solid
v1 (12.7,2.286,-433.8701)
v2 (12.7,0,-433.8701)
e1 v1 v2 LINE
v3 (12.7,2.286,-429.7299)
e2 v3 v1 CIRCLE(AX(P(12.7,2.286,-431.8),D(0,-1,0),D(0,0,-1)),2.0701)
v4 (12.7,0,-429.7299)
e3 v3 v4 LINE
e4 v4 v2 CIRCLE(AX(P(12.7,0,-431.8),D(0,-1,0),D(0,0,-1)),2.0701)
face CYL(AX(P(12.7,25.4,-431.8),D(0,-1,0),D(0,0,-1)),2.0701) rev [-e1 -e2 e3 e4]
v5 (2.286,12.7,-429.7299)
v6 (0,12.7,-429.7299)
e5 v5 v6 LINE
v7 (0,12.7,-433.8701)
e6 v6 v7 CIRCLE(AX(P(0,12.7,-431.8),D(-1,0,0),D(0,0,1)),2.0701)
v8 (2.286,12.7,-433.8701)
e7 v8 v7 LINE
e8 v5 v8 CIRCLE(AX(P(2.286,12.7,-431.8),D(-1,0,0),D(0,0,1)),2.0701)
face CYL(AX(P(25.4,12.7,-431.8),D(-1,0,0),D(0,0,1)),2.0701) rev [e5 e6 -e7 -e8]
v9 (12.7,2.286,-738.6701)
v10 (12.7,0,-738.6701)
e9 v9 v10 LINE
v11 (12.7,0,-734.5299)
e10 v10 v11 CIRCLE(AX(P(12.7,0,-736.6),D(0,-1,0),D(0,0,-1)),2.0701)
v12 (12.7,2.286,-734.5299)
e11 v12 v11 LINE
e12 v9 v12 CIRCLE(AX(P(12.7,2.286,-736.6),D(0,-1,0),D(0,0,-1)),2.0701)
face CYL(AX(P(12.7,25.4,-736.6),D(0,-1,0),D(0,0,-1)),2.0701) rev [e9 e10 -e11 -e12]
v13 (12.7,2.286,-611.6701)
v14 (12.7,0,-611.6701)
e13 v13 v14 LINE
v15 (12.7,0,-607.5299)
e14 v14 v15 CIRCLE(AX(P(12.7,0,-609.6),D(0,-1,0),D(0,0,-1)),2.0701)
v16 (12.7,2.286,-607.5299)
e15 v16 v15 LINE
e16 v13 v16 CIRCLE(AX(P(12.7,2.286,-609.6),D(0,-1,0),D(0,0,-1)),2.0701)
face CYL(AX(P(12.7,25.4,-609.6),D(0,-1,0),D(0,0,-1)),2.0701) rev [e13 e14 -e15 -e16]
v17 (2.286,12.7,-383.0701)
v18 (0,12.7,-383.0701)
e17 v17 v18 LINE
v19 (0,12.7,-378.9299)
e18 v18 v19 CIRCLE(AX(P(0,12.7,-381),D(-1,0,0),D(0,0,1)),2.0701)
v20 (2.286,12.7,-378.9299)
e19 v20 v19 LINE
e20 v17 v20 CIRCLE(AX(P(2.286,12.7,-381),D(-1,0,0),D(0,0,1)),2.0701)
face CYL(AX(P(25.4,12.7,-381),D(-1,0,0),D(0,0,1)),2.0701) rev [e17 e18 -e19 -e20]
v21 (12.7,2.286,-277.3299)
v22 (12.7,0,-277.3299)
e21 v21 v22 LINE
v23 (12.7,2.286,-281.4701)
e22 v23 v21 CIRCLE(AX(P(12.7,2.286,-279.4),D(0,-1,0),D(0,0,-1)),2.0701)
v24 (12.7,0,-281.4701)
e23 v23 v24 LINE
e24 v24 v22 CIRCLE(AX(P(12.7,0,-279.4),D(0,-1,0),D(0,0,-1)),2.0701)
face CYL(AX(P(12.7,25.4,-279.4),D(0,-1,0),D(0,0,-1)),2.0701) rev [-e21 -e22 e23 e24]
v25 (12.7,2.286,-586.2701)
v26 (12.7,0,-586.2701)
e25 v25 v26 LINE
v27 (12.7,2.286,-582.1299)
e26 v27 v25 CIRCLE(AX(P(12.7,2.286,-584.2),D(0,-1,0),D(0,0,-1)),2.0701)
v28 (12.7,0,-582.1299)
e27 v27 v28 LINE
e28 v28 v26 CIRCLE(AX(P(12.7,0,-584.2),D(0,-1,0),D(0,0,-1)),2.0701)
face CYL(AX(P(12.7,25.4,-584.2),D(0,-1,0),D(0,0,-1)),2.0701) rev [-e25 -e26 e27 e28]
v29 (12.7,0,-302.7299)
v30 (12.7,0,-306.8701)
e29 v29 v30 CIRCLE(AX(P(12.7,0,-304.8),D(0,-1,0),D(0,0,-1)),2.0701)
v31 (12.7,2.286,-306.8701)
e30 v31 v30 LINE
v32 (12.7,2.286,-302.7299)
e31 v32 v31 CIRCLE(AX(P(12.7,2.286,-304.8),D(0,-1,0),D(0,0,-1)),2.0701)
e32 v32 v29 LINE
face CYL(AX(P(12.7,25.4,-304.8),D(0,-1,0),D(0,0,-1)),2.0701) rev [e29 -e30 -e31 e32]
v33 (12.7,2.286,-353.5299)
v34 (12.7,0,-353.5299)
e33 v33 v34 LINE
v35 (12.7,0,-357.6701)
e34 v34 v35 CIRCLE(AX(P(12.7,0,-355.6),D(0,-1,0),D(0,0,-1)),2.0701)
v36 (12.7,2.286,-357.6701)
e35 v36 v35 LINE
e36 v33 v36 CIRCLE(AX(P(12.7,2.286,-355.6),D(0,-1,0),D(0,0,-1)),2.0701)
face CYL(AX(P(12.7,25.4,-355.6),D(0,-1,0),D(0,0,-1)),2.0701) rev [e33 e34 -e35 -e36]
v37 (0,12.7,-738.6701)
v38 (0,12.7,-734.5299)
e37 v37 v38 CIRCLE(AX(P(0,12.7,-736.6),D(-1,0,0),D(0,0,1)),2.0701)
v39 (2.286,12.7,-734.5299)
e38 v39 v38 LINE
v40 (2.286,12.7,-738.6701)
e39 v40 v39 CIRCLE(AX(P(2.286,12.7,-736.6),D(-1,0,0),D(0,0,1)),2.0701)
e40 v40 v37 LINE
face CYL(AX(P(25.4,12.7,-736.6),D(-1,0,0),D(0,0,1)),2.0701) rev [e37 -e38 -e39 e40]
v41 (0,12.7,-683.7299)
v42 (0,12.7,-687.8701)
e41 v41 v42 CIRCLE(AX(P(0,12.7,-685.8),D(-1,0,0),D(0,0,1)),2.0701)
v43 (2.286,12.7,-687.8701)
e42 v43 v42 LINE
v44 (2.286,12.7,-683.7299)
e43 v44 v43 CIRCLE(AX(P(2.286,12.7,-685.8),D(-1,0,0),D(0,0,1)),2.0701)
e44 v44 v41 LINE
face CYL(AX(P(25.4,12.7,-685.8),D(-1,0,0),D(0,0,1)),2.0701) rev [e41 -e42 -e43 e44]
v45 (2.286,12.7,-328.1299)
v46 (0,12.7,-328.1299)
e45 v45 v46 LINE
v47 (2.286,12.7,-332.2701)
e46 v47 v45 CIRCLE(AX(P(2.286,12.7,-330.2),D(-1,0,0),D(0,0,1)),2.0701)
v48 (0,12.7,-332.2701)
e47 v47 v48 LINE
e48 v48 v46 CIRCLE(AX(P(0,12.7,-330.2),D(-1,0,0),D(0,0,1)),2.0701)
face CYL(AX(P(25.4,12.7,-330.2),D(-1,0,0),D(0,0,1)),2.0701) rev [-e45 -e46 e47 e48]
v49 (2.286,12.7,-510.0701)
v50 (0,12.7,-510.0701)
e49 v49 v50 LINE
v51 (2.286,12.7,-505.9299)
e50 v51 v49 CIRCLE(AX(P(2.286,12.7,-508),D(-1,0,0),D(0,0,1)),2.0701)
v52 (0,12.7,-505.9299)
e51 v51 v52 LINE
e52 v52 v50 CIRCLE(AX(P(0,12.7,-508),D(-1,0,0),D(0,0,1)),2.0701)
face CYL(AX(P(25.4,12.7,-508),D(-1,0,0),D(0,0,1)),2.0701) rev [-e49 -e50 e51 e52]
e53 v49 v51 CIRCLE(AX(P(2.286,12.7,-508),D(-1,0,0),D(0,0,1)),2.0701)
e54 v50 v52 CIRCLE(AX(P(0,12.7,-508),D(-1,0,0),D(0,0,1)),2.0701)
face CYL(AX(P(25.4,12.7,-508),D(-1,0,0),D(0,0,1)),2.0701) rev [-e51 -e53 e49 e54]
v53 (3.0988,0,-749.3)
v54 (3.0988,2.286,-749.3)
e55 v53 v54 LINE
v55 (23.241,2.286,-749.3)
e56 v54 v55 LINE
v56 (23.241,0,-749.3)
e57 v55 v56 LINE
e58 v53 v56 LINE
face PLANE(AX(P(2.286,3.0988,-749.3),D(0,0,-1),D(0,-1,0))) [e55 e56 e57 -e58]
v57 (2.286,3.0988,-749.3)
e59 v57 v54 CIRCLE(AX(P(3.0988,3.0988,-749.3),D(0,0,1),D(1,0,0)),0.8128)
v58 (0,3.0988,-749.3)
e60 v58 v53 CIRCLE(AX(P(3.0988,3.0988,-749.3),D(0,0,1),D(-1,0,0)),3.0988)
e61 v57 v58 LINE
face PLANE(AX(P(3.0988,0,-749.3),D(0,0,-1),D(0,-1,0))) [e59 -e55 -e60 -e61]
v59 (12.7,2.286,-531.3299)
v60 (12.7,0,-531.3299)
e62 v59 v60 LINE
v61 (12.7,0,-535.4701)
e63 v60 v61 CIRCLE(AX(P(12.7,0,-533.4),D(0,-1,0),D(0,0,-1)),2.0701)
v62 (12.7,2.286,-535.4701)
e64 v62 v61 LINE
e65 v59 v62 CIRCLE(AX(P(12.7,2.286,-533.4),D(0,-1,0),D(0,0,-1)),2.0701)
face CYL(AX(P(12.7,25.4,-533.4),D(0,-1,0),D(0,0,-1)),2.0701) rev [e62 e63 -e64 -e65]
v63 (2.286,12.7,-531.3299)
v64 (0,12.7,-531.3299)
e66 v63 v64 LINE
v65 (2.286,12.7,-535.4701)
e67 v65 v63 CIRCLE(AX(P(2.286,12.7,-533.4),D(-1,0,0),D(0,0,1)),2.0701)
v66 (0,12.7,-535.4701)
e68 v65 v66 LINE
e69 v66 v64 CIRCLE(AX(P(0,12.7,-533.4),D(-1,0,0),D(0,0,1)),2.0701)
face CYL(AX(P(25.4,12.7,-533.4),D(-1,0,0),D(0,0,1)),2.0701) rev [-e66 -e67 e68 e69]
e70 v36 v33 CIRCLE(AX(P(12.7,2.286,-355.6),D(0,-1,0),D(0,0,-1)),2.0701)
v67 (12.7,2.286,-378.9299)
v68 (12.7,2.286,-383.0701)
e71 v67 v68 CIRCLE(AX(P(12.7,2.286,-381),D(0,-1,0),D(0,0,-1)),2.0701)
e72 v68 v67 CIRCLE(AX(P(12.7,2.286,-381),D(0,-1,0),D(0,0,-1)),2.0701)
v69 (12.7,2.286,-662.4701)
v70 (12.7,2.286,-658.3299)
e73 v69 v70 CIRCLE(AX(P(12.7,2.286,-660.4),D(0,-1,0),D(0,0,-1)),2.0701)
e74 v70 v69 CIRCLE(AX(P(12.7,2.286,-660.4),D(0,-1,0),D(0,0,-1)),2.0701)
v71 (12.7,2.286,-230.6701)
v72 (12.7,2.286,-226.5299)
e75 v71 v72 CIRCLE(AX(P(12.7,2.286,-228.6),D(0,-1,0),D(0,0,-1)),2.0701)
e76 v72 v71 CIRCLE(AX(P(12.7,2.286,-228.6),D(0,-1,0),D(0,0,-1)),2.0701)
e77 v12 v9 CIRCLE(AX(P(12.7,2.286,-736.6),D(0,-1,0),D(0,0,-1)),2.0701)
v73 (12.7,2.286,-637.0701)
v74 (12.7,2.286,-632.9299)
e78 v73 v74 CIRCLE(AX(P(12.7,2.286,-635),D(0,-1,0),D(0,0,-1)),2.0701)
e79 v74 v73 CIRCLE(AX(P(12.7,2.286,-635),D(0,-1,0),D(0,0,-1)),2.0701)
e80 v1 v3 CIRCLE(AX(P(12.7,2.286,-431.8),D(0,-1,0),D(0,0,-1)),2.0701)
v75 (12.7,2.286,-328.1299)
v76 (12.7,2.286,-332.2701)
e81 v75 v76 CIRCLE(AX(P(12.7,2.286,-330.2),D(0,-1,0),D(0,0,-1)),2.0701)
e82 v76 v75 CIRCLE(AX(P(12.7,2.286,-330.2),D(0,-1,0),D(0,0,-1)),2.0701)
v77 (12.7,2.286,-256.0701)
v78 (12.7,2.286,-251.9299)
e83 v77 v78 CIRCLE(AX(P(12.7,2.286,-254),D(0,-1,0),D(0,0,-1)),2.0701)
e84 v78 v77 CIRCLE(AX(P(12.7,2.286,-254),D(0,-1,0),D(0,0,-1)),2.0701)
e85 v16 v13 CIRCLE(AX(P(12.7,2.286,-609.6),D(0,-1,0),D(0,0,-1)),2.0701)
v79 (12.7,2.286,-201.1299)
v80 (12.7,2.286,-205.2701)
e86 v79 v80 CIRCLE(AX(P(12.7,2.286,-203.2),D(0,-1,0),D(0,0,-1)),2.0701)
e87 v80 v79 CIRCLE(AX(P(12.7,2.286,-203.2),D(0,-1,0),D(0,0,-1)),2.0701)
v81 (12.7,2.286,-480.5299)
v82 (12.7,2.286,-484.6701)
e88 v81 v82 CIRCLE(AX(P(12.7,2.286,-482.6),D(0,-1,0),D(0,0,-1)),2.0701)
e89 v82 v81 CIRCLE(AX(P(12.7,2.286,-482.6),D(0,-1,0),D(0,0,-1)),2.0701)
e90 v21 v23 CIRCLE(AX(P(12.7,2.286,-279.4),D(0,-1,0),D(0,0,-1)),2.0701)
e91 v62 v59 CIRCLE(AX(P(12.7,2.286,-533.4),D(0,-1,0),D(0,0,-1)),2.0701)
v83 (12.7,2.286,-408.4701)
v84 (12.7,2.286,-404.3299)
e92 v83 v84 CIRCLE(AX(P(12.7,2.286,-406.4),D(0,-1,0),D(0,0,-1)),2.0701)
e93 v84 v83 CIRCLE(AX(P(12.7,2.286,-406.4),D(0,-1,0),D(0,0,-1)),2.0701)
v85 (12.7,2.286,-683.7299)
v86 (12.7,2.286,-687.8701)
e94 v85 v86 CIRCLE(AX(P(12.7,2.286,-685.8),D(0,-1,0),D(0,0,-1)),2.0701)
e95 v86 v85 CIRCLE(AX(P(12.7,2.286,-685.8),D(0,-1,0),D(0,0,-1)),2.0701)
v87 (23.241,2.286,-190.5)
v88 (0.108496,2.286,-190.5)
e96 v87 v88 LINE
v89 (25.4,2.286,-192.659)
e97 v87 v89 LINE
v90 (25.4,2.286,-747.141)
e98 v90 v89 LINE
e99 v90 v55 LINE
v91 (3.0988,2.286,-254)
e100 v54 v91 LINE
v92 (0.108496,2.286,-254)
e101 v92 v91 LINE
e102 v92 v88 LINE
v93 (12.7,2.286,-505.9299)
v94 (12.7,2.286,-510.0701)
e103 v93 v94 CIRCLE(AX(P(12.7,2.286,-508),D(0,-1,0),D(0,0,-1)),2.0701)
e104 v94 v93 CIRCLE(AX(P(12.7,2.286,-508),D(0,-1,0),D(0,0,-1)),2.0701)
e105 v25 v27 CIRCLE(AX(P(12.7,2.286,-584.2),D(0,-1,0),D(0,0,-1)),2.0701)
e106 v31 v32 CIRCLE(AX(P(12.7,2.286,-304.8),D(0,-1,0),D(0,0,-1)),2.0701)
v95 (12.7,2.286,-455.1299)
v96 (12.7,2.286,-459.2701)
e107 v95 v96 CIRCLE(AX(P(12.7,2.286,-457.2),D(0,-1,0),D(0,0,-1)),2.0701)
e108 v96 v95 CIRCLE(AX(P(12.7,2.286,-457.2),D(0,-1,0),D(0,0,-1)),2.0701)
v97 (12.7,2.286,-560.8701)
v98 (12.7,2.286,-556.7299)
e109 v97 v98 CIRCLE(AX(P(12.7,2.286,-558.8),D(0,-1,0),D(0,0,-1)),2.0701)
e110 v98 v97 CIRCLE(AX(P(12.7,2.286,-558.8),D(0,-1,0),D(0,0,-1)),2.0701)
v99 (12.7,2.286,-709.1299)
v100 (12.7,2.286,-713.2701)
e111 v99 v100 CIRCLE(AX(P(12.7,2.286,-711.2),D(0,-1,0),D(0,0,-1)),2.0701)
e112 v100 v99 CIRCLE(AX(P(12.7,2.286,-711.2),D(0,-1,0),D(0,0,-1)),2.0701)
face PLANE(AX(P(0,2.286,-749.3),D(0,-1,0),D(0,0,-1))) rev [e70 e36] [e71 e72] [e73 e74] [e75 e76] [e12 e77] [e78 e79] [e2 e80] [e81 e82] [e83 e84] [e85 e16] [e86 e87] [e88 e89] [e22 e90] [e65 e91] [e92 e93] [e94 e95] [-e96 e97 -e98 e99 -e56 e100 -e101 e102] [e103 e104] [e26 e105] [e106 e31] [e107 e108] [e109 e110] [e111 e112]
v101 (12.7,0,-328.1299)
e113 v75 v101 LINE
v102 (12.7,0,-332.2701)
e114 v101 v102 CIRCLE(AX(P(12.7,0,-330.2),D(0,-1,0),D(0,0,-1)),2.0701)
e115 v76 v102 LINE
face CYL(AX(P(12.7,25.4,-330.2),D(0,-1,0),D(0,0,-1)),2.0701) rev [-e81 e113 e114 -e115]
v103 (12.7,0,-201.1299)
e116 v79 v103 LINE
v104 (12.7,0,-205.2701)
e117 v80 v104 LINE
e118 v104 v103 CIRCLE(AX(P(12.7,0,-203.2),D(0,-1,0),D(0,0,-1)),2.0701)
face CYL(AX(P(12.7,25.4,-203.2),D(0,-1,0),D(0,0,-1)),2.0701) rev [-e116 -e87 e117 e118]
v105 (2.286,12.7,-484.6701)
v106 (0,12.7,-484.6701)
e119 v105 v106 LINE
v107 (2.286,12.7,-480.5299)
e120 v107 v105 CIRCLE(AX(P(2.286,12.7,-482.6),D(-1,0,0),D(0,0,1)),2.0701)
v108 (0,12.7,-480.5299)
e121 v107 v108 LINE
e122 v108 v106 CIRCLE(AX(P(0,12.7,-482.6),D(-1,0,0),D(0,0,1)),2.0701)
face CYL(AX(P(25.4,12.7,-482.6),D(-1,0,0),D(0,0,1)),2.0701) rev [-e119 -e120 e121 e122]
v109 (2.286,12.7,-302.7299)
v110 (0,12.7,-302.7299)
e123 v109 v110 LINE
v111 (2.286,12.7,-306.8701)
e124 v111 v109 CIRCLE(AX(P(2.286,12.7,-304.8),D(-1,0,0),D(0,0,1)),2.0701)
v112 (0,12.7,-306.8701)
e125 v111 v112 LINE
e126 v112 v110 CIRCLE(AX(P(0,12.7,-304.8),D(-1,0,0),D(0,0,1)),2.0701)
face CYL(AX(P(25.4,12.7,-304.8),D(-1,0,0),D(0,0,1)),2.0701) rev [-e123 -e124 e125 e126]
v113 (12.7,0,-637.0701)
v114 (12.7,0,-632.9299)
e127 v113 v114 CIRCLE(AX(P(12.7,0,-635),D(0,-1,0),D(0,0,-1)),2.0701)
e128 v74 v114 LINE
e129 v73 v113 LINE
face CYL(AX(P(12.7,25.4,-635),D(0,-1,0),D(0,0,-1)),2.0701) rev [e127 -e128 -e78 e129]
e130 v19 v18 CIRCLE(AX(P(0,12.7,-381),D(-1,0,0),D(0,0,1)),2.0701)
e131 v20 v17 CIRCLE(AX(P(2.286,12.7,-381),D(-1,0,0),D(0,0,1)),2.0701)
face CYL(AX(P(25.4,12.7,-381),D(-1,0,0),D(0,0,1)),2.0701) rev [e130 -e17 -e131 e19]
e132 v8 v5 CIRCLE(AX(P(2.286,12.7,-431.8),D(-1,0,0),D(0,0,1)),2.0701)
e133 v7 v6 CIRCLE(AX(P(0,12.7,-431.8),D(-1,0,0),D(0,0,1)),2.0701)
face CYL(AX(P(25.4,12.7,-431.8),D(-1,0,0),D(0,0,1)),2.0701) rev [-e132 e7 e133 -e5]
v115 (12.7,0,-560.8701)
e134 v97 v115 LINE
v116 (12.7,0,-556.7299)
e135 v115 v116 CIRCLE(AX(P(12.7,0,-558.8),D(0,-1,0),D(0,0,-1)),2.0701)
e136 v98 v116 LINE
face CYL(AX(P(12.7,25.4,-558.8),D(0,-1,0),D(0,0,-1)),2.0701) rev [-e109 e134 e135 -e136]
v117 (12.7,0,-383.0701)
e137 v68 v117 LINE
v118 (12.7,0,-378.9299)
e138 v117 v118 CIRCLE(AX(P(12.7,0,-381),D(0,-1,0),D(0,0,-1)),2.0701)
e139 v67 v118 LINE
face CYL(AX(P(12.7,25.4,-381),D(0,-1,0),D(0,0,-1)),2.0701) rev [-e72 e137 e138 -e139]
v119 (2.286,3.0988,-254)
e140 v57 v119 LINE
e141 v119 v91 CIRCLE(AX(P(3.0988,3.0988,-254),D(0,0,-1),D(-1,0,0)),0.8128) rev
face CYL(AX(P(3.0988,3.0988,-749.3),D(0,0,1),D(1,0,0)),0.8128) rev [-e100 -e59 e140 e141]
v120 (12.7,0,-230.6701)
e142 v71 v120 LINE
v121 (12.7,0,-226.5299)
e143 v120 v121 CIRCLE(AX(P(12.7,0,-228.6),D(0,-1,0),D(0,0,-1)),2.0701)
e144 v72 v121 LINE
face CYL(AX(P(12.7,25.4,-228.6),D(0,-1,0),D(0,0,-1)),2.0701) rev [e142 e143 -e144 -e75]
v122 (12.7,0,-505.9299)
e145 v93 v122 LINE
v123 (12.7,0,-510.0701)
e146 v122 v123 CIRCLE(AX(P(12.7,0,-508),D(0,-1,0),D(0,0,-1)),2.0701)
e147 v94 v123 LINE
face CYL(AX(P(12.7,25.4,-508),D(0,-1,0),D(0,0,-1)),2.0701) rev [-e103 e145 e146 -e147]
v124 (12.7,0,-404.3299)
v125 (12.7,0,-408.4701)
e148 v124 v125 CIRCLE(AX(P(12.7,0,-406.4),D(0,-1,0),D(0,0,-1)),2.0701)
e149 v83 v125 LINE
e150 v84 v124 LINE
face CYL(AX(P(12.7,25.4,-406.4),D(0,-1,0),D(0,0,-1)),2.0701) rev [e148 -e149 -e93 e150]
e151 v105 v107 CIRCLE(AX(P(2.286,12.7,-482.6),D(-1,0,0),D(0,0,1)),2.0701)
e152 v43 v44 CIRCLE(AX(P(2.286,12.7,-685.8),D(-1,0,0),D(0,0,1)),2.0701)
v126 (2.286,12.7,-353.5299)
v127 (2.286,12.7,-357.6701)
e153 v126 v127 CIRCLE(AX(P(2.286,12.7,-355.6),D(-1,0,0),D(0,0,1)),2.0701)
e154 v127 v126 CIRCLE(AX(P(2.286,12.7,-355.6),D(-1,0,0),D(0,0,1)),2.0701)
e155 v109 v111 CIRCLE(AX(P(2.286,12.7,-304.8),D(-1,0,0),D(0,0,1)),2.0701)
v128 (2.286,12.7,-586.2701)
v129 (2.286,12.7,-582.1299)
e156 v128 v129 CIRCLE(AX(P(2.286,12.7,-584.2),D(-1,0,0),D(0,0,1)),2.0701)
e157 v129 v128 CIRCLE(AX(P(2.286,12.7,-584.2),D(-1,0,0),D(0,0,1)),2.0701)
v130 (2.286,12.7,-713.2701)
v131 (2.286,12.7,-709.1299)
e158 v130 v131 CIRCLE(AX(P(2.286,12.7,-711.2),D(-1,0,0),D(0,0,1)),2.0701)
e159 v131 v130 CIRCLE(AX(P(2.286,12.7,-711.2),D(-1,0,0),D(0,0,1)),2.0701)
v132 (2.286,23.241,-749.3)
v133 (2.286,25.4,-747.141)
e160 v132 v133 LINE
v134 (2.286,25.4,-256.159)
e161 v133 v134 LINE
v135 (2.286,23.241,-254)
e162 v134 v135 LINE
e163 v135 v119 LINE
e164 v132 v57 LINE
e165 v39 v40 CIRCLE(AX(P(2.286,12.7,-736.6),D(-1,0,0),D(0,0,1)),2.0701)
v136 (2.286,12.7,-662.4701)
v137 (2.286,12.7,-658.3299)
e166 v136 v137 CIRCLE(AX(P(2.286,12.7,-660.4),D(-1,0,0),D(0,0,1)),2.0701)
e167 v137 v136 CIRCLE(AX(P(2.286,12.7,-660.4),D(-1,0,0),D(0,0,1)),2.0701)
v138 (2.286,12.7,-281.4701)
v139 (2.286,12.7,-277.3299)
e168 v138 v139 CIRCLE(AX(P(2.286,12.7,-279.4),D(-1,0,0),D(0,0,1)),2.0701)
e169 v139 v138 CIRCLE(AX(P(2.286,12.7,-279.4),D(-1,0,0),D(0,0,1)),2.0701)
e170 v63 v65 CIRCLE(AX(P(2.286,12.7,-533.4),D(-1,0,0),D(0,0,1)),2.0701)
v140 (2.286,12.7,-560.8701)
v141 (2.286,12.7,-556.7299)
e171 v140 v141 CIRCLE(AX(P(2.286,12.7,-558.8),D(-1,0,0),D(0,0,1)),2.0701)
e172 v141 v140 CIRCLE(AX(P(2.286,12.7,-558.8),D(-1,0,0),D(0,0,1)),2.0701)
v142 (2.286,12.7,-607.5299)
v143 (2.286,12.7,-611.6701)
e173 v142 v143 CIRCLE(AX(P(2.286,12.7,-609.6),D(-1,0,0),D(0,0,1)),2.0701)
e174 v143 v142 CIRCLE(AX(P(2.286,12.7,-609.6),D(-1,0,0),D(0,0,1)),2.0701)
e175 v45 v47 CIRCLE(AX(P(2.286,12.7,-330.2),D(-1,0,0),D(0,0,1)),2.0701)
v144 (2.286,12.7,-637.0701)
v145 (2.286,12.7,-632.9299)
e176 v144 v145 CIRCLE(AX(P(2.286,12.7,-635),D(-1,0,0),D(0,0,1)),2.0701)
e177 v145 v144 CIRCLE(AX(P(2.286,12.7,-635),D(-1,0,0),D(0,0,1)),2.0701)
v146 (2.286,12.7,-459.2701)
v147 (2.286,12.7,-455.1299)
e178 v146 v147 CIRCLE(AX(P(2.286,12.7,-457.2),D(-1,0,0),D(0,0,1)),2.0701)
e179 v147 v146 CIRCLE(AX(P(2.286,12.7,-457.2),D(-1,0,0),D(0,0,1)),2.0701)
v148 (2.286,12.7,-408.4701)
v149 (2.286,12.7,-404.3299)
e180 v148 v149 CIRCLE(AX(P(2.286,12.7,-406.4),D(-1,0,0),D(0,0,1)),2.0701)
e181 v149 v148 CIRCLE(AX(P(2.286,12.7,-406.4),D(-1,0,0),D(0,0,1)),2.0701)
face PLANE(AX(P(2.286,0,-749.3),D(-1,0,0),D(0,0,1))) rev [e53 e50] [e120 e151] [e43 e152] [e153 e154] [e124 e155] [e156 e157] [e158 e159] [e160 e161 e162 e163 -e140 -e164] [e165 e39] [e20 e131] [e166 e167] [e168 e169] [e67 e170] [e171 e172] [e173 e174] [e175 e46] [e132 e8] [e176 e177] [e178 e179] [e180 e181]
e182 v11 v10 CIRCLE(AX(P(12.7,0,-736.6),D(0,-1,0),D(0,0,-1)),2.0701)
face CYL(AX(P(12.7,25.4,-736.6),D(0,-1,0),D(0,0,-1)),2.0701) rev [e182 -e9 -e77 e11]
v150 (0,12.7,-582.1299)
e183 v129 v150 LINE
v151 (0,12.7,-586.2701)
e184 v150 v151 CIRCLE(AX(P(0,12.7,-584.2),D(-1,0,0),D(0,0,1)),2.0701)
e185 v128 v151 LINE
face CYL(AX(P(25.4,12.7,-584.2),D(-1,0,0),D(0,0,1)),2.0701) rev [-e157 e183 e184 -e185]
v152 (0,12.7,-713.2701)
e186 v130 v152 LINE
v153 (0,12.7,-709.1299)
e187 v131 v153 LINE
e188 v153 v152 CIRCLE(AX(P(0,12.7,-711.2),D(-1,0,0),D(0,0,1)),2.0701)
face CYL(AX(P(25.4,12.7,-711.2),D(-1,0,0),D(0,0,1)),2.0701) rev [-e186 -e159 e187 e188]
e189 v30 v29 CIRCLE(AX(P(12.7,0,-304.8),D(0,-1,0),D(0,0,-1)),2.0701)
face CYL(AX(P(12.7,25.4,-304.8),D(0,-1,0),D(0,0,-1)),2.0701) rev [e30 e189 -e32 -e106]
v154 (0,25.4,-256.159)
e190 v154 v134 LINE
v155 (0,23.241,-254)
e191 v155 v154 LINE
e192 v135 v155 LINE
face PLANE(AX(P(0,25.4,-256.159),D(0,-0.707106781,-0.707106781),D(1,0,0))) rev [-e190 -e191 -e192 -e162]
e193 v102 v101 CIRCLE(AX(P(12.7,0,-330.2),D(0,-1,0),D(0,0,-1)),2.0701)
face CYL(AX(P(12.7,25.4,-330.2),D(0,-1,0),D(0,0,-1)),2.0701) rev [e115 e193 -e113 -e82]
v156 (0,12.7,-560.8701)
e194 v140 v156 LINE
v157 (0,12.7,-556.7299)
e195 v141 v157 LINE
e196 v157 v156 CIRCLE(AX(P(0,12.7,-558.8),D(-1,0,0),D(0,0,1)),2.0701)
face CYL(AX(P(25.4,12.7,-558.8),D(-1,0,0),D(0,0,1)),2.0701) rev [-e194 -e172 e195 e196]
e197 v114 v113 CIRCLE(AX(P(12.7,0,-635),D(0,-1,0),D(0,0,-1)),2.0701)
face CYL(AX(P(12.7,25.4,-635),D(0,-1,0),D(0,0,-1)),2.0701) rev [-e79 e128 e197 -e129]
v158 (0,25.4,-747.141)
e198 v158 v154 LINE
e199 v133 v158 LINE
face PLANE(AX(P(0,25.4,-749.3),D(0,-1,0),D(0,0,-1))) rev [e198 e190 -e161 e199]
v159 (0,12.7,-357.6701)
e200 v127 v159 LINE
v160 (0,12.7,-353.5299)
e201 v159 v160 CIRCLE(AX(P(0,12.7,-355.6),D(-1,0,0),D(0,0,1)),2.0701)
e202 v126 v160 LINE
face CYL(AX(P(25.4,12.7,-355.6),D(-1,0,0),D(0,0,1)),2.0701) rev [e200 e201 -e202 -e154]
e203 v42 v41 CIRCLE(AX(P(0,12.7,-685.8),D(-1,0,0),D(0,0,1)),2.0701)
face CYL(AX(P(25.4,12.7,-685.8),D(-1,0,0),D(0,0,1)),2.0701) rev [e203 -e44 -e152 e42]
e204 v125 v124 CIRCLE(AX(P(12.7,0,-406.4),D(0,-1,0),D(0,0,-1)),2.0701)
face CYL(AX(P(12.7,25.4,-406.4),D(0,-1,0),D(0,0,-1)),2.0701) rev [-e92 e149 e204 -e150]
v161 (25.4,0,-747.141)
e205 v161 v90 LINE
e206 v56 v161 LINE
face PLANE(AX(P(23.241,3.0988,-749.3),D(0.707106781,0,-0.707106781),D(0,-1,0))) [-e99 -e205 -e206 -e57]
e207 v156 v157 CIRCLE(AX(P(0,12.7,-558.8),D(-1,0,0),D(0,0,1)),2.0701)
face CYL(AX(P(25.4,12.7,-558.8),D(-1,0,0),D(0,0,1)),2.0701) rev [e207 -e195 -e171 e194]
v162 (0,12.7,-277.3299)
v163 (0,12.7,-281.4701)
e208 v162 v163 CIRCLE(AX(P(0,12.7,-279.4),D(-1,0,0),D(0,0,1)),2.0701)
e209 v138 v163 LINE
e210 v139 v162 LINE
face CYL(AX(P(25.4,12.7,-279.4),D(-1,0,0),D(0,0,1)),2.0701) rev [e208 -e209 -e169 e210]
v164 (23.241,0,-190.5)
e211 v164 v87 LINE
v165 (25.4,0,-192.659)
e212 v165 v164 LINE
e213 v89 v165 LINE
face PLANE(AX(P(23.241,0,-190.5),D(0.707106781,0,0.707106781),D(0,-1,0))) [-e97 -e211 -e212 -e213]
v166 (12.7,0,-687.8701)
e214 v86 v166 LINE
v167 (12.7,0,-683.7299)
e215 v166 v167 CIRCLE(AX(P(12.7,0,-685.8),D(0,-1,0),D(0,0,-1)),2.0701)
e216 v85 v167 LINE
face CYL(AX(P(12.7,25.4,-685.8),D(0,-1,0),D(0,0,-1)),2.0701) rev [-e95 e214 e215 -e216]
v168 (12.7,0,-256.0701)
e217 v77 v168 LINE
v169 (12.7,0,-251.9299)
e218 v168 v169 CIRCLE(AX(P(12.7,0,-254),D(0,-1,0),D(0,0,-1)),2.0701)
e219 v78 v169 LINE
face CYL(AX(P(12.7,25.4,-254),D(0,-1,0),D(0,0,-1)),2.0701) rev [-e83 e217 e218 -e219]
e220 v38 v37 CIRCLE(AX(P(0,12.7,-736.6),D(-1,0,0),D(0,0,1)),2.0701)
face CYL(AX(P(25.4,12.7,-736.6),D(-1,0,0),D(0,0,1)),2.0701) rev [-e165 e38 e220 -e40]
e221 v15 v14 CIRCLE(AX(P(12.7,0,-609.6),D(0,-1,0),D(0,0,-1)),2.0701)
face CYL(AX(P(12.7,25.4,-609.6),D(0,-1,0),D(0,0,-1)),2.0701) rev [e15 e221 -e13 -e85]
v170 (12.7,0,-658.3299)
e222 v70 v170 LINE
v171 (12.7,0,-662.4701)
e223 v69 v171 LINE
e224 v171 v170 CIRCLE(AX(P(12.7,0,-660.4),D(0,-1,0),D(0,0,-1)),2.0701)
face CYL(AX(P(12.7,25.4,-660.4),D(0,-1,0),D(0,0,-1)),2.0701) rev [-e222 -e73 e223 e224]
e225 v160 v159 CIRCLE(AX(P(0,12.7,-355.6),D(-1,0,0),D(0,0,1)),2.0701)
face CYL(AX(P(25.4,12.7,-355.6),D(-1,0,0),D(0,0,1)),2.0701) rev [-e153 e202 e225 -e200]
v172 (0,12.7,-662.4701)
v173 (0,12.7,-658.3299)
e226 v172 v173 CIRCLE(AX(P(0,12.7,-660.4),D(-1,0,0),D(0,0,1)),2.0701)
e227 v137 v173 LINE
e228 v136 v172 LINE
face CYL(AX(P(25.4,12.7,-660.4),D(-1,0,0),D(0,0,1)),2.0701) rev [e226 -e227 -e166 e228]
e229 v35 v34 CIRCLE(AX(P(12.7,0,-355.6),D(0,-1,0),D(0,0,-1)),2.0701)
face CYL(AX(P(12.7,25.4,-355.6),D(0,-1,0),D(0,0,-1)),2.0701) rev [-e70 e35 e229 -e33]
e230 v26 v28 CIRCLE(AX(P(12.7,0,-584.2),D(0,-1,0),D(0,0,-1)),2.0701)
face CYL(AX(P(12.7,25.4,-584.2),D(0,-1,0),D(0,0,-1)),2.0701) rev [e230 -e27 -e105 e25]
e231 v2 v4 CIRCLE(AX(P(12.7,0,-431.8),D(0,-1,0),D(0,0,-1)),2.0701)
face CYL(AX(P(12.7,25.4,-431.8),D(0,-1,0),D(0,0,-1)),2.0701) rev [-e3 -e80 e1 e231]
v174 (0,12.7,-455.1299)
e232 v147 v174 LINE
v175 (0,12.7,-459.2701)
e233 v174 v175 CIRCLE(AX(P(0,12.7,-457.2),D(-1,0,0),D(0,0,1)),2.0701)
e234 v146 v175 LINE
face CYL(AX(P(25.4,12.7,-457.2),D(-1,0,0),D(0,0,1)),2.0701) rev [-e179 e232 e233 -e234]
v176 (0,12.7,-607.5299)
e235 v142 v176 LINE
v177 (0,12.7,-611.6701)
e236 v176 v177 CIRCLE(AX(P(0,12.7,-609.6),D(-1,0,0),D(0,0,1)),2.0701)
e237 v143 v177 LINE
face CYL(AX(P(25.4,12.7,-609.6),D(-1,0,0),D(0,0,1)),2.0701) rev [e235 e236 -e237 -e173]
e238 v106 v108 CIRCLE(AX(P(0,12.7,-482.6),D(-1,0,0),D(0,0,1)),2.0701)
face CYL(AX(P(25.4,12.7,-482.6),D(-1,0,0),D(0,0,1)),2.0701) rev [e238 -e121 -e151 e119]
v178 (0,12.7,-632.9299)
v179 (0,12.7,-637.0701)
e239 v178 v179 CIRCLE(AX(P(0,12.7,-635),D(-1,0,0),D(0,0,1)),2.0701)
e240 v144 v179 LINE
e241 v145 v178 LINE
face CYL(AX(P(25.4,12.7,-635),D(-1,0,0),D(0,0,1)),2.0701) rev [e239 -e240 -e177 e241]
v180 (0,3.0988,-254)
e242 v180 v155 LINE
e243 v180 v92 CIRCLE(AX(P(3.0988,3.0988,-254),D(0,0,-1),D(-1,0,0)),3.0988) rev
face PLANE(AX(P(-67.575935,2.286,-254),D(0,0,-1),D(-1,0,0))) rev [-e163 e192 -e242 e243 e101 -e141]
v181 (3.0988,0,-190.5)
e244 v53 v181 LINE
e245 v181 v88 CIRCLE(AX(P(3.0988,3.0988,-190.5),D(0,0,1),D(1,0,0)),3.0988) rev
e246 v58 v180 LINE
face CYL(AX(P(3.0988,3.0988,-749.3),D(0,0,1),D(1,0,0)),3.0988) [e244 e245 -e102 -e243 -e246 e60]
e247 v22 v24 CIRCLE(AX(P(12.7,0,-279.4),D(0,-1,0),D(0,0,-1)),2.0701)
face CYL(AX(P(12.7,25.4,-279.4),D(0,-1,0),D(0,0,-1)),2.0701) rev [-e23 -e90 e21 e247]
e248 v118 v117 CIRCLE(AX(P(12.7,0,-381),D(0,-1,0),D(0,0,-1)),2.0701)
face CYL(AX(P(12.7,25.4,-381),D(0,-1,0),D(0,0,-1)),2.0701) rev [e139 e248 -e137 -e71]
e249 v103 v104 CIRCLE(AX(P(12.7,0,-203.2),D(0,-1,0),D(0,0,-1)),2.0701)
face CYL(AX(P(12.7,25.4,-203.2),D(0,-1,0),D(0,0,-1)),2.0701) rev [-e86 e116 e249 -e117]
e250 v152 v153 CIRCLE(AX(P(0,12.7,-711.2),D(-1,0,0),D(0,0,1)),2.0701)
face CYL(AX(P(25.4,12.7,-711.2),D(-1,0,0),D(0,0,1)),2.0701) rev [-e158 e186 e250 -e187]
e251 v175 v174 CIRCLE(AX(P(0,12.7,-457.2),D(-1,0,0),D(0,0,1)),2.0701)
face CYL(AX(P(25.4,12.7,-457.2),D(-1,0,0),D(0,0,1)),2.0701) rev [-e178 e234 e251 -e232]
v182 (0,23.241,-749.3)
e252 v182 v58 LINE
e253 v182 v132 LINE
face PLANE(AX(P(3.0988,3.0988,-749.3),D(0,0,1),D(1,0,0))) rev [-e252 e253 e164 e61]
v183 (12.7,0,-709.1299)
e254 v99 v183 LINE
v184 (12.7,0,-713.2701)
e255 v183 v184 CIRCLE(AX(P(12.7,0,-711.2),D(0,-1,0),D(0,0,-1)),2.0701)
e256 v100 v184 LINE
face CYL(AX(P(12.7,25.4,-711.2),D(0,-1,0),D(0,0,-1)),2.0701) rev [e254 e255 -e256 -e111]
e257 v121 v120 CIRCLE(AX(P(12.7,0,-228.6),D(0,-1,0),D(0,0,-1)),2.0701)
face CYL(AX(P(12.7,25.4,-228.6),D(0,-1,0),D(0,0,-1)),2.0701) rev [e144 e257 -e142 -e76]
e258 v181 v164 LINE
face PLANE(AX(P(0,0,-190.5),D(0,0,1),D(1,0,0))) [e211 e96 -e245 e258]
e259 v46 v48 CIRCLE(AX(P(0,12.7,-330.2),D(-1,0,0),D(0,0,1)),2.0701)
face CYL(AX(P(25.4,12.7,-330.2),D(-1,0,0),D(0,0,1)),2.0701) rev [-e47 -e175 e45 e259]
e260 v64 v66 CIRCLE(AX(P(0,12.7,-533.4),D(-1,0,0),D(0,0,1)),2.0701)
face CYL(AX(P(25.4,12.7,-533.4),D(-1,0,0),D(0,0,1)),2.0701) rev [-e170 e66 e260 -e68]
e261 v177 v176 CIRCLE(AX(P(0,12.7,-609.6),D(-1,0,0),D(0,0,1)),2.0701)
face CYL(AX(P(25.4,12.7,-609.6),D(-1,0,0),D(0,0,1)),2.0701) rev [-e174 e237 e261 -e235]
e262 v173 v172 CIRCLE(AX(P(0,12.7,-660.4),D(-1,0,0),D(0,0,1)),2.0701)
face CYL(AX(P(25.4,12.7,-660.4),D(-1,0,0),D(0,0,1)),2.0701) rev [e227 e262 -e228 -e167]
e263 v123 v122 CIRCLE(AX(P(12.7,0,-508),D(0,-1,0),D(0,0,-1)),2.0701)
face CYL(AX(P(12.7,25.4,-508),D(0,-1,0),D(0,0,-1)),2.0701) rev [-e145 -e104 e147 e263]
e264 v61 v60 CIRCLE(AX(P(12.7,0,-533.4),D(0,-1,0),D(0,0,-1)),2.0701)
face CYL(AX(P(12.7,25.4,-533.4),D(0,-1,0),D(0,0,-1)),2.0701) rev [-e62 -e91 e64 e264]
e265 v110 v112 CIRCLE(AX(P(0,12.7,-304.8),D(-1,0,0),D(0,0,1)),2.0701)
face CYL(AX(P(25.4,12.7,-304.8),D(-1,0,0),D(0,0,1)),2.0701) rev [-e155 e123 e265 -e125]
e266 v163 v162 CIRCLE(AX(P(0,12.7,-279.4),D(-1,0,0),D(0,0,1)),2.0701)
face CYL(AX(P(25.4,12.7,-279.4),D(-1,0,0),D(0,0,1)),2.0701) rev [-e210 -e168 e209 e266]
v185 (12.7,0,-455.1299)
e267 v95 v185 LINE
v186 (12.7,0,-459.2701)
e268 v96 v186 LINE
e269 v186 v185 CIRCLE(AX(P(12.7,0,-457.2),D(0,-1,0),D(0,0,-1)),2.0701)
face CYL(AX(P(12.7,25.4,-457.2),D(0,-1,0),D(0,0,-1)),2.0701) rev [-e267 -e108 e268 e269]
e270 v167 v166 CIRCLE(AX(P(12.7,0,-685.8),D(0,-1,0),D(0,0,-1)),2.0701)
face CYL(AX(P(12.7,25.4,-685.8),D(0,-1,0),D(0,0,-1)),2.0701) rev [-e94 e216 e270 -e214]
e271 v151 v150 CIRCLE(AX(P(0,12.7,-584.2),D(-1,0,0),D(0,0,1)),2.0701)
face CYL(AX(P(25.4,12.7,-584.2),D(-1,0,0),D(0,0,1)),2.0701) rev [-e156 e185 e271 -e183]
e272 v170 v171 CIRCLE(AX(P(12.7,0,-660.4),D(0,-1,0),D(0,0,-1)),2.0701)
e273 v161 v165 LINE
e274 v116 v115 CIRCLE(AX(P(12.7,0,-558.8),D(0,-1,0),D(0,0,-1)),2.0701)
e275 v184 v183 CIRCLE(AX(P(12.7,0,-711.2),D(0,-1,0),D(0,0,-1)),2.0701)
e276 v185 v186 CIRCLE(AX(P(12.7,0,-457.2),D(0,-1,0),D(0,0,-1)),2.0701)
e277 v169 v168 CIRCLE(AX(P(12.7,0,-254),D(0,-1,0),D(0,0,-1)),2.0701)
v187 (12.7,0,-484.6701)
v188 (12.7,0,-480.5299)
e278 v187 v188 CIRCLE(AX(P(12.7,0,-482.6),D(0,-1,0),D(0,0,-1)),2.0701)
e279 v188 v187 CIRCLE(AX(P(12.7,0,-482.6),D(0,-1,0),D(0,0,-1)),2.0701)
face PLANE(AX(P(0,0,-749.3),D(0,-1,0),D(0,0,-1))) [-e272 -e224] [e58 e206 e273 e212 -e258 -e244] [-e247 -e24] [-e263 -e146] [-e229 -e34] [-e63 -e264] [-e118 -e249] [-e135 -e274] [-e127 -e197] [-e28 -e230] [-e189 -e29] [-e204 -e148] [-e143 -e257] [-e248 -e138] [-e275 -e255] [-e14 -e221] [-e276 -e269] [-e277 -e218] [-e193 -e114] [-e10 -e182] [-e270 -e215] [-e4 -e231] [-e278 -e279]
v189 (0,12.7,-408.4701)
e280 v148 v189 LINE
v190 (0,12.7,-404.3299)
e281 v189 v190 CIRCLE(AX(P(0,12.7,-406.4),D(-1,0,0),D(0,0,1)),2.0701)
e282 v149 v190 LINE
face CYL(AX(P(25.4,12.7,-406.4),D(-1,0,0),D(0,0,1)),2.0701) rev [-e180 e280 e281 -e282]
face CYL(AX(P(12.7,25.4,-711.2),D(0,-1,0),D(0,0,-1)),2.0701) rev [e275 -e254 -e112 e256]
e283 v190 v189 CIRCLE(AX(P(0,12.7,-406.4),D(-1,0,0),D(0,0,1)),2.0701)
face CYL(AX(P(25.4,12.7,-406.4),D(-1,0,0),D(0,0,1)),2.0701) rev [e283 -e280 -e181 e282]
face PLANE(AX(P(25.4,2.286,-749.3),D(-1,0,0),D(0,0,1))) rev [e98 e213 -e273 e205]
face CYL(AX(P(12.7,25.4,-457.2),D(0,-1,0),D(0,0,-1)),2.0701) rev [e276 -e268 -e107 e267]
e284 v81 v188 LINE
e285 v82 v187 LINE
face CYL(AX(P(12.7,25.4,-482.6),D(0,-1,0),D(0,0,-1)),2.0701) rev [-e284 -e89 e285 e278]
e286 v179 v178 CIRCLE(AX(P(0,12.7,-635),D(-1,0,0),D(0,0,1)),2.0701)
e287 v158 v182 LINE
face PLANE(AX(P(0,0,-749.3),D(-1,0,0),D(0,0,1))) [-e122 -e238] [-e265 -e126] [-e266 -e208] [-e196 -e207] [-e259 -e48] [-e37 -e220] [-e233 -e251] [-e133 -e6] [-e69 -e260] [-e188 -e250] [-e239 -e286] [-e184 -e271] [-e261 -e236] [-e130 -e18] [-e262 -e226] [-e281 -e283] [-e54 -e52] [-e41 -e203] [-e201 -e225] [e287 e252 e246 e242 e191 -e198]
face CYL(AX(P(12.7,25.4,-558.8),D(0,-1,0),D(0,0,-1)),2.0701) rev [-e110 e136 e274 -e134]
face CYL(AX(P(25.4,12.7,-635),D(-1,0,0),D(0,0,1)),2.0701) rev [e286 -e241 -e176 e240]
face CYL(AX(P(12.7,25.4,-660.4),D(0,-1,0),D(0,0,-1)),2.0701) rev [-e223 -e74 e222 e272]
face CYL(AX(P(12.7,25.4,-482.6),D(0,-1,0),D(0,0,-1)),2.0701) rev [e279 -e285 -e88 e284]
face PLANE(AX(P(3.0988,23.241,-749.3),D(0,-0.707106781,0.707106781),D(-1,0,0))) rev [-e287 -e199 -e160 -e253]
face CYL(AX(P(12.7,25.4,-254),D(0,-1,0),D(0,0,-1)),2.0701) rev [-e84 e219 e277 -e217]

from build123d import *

# Parameters (mm, degrees)
CUT_EXTRUDE1_OUTLINE_R   = 2.0701
CUT_EXTRUDE1_DEPTH       = 3.0988
CUT_EXTRUDE1_START       = 2.286
CUT_EXTRUDE1_2_OUTLINE_W = 2.286
CUT_EXTRUDE1_2_OUTLINE_H = 558.8
CUT_EXTRUDE1_2_DEPTH     = 23.114
CUT_EXTRUDE1_START_2     = 3.0988
CUT_EXTRUDE1_3_OUTLINE_W = 0.8128
CUT_EXTRUDE1_3_OUTLINE_H = 558.8
CUT_EXTRUDE1_3_DEPTH     = 22.3012
CUT_EXTRUDE1_4_OUTLINE_R = 2.0701
CUT_EXTRUDE1_4_DEPTH     = 2.286
CUT_EXTRUDE1_START_3     = -749.3
CUT_EXTRUDE1_5_DEPTH     = 558.8
CUT_EXTRUDE1_START_4     = 546.268979845
CUT_EXTRUDE1_6_OUTLINE_W = 4
CUT_EXTRUDE1_6_OUTLINE_H = 359
CUT_EXTRUDE1_6_DEPTH     = 2.731020155
CHAMFER1_SIZE            = 2.159
CUT_EXTRUDE2_START       = -2.286
SKETCH2_W                = 63.5
SKETCH2_H                = 23.114
CUT_EXTRUDE2_DEPTH       = 3.0988
CHAMFER2_SIZE            = 2.159
BOSS_EXTRUDE1_START      = -2.286
BOSS_EXTRUDE1_DEPTH      = 2.286


with BuildPart() as part:
    # Cut-Extrude1: read off the stored shape, not the designer's step
    # Cut-Extrude1 outline → Cut-Extrude1 (new body)
    with BuildSketch(Plane(origin=(0, 0, 0), x_dir=(1, 0, 0), z_dir=(0, 1, 0))):
        Polygon((0, 749.3), (0, 190.5), (25.4, 190.5), (25.4, 747.141), (23.241, 749.3), align=None)
        with Locations((12.7, 736.6)):
            Circle(CUT_EXTRUDE1_OUTLINE_R, mode=Mode.SUBTRACT)
        with Locations((12.7, 203.2)):
            Circle(CUT_EXTRUDE1_OUTLINE_R, mode=Mode.SUBTRACT)
        with Locations((12.7, 228.6)):
            Circle(CUT_EXTRUDE1_OUTLINE_R, mode=Mode.SUBTRACT)
        with Locations((12.7, 254)):
            Circle(CUT_EXTRUDE1_OUTLINE_R, mode=Mode.SUBTRACT)
        with Locations((12.7, 279.4)):
            Circle(CUT_EXTRUDE1_OUTLINE_R, mode=Mode.SUBTRACT)
        with Locations((12.7, 304.8)):
            Circle(CUT_EXTRUDE1_OUTLINE_R, mode=Mode.SUBTRACT)
        with Locations((12.7, 330.2)):
            Circle(CUT_EXTRUDE1_OUTLINE_R, mode=Mode.SUBTRACT)
        with Locations((12.7, 355.6)):
            Circle(CUT_EXTRUDE1_OUTLINE_R, mode=Mode.SUBTRACT)
        with Locations((12.7, 381)):
            Circle(CUT_EXTRUDE1_OUTLINE_R, mode=Mode.SUBTRACT)
        with Locations((12.7, 406.4)):
            Circle(CUT_EXTRUDE1_OUTLINE_R, mode=Mode.SUBTRACT)
        with Locations((12.7, 431.8)):
            Circle(CUT_EXTRUDE1_OUTLINE_R, mode=Mode.SUBTRACT)
        with Locations((12.7, 457.2)):
            Circle(CUT_EXTRUDE1_OUTLINE_R, mode=Mode.SUBTRACT)
        with Locations((12.7, 482.6)):
            Circle(CUT_EXTRUDE1_OUTLINE_R, mode=Mode.SUBTRACT)
        with Locations((12.7, 508)):
            Circle(CUT_EXTRUDE1_OUTLINE_R, mode=Mode.SUBTRACT)
        with Locations((12.7, 533.4)):
            Circle(CUT_EXTRUDE1_OUTLINE_R, mode=Mode.SUBTRACT)
        with Locations((12.7, 558.8)):
            Circle(CUT_EXTRUDE1_OUTLINE_R, mode=Mode.SUBTRACT)
        with Locations((12.7, 584.2)):
            Circle(CUT_EXTRUDE1_OUTLINE_R, mode=Mode.SUBTRACT)
        with Locations((12.7, 609.6)):
            Circle(CUT_EXTRUDE1_OUTLINE_R, mode=Mode.SUBTRACT)
        with Locations((12.7, 635)):
            Circle(CUT_EXTRUDE1_OUTLINE_R, mode=Mode.SUBTRACT)
        with Locations((12.7, 660.4)):
            Circle(CUT_EXTRUDE1_OUTLINE_R, mode=Mode.SUBTRACT)
        with Locations((12.7, 685.8)):
            Circle(CUT_EXTRUDE1_OUTLINE_R, mode=Mode.SUBTRACT)
        with Locations((12.7, 711.2)):
            Circle(CUT_EXTRUDE1_OUTLINE_R, mode=Mode.SUBTRACT)
    extrude(amount=CUT_EXTRUDE1_DEPTH)

    # Cut-Extrude1 2 outline → Cut-Extrude1 2 (add)
    with BuildSketch(Plane(origin=(0, 0, 0), x_dir=(1, 0, 0), z_dir=(0, 1, 0)).offset(CUT_EXTRUDE1_START)):
        with Locations((1.143, 469.9)):
            Rectangle(CUT_EXTRUDE1_2_OUTLINE_W, CUT_EXTRUDE1_2_OUTLINE_H)
    extrude(amount=CUT_EXTRUDE1_2_DEPTH)

    # Cut-Extrude1 3 outline → Cut-Extrude1 3 (cut)
    with BuildSketch(Plane.YZ.offset(CUT_EXTRUDE1_START_2)):
        with Locations((2.6924, -469.9)):
            Rectangle(CUT_EXTRUDE1_3_OUTLINE_W, CUT_EXTRUDE1_3_OUTLINE_H)
    extrude(amount=CUT_EXTRUDE1_3_DEPTH, mode=Mode.SUBTRACT)

    # Cut-Extrude1 4 outline → Cut-Extrude1 4 (cut)
    with BuildSketch(Plane.YZ):
        with Locations((12.7, -736.6)):
            Circle(CUT_EXTRUDE1_4_OUTLINE_R)
        with Locations((12.7, -711.2)):
            Circle(CUT_EXTRUDE1_4_OUTLINE_R)
        with Locations((12.7, -685.8)):
            Circle(CUT_EXTRUDE1_4_OUTLINE_R)
        with Locations((12.7, -660.4)):
            Circle(CUT_EXTRUDE1_4_OUTLINE_R)
        with Locations((12.7, -635)):
            Circle(CUT_EXTRUDE1_4_OUTLINE_R)
        with Locations((12.7, -609.6)):
            Circle(CUT_EXTRUDE1_4_OUTLINE_R)
        with Locations((12.7, -584.2)):
            Circle(CUT_EXTRUDE1_4_OUTLINE_R)
        with Locations((12.7, -558.8)):
            Circle(CUT_EXTRUDE1_4_OUTLINE_R)
        with Locations((12.7, -533.4)):
            Circle(CUT_EXTRUDE1_4_OUTLINE_R)
        with Locations((12.7, -508)):
            Circle(CUT_EXTRUDE1_4_OUTLINE_R)
        with Locations((12.7, -482.6)):
            Circle(CUT_EXTRUDE1_4_OUTLINE_R)
        with Locations((12.7, -457.2)):
            Circle(CUT_EXTRUDE1_4_OUTLINE_R)
        with Locations((12.7, -431.8)):
            Circle(CUT_EXTRUDE1_4_OUTLINE_R)
        with Locations((12.7, -406.4)):
            Circle(CUT_EXTRUDE1_4_OUTLINE_R)
        with Locations((12.7, -381)):
            Circle(CUT_EXTRUDE1_4_OUTLINE_R)
        with Locations((12.7, -355.6)):
            Circle(CUT_EXTRUDE1_4_OUTLINE_R)
        with Locations((12.7, -330.2)):
            Circle(CUT_EXTRUDE1_4_OUTLINE_R)
        with Locations((12.7, -304.8)):
            Circle(CUT_EXTRUDE1_4_OUTLINE_R)
        with Locations((12.7, -279.4)):
            Circle(CUT_EXTRUDE1_4_OUTLINE_R)
        with Locations((12.7, -254)):
            Circle(CUT_EXTRUDE1_4_OUTLINE_R)
        with Locations((12.7, -228.6)):
            Circle(CUT_EXTRUDE1_4_OUTLINE_R)
        with Locations((12.7, -203.2)):
            Circle(CUT_EXTRUDE1_4_OUTLINE_R)
    extrude(amount=CUT_EXTRUDE1_4_DEPTH, mode=Mode.SUBTRACT)

    # Cut-Extrude1 5 outline → Cut-Extrude1 5 (cut)
    with BuildSketch(Plane.XY.offset(CUT_EXTRUDE1_START_3)):
        with BuildLine():
            ThreePointArc((3.0988, 0), (0.907617506, 0.907617506), (0, 3.0988))
            Line((0, 3.0988), (0, 0))
            Line((0, 0), (3.0988, 0))
        make_face()
        with BuildLine():
            Line((3.0988, 3.0988), (2.286, 3.0988))
            ThreePointArc((2.286, 3.0988), (2.524063608, 2.524063608), (3.0988, 2.286))
            Line((3.0988, 2.286), (3.0988, 3.0988))
        make_face()
    extrude(amount=CUT_EXTRUDE1_5_DEPTH, mode=Mode.SUBTRACT)

    # Cut-Extrude1 6 outline → Cut-Extrude1 6 (cut)
    with BuildSketch(Plane(origin=(0, 0, 0), x_dir=(1, 0, 0), z_dir=(0, 0.7071067811865511, -0.7071067811865441)).offset(CUT_EXTRUDE1_START_4)):
        with Locations((2, 349.5)):
            Rectangle(CUT_EXTRUDE1_6_OUTLINE_W, CUT_EXTRUDE1_6_OUTLINE_H)
    extrude(amount=CUT_EXTRUDE1_6_DEPTH, mode=Mode.SUBTRACT)

    # Chamfer1
    chamfer1_edges = [part.edges().sort_by_distance(p)[0] for p in [
        (1.143, 25.4, -190.5),
        (25.4, 1.143, -190.5),
    ]]
    chamfer(chamfer1_edges, length=CHAMFER1_SIZE)

    # Sketch2 → Cut-Extrude2 (cut)
    with BuildSketch(Plane(origin=(2.286, 0, 0), x_dir=(0, 0, -1), z_dir=(1, 0, 0)).offset(CUT_EXTRUDE2_START)):
        with Locations((222.25, 13.843)):
            Rectangle(SKETCH2_W, SKETCH2_H)
    extrude(amount=CUT_EXTRUDE2_DEPTH, mode=Mode.SUBTRACT)

    # Chamfer2
    chamfer2_edges = [part.edges().sort_by_distance(p)[0] for p in [
        (1.143, 25.4, -254),
    ]]
    chamfer(chamfer2_edges, length=CHAMFER2_SIZE)

    # Sketch3 → Boss-Extrude1 (add)
    with BuildSketch(Plane(origin=(2.286, 0, 0), x_dir=(0, 0, -1), z_dir=(1, 0, 0)).offset(BOSS_EXTRUDE1_START)):
        with BuildLine():
            Line((254, 10.6299), (254, 14.7701))
            ThreePointArc((254, 14.7701), (256.0701, 12.7), (254, 10.6299))
        make_face()
    extrude(amount=BOSS_EXTRUDE1_DEPTH)


solid = part.part
